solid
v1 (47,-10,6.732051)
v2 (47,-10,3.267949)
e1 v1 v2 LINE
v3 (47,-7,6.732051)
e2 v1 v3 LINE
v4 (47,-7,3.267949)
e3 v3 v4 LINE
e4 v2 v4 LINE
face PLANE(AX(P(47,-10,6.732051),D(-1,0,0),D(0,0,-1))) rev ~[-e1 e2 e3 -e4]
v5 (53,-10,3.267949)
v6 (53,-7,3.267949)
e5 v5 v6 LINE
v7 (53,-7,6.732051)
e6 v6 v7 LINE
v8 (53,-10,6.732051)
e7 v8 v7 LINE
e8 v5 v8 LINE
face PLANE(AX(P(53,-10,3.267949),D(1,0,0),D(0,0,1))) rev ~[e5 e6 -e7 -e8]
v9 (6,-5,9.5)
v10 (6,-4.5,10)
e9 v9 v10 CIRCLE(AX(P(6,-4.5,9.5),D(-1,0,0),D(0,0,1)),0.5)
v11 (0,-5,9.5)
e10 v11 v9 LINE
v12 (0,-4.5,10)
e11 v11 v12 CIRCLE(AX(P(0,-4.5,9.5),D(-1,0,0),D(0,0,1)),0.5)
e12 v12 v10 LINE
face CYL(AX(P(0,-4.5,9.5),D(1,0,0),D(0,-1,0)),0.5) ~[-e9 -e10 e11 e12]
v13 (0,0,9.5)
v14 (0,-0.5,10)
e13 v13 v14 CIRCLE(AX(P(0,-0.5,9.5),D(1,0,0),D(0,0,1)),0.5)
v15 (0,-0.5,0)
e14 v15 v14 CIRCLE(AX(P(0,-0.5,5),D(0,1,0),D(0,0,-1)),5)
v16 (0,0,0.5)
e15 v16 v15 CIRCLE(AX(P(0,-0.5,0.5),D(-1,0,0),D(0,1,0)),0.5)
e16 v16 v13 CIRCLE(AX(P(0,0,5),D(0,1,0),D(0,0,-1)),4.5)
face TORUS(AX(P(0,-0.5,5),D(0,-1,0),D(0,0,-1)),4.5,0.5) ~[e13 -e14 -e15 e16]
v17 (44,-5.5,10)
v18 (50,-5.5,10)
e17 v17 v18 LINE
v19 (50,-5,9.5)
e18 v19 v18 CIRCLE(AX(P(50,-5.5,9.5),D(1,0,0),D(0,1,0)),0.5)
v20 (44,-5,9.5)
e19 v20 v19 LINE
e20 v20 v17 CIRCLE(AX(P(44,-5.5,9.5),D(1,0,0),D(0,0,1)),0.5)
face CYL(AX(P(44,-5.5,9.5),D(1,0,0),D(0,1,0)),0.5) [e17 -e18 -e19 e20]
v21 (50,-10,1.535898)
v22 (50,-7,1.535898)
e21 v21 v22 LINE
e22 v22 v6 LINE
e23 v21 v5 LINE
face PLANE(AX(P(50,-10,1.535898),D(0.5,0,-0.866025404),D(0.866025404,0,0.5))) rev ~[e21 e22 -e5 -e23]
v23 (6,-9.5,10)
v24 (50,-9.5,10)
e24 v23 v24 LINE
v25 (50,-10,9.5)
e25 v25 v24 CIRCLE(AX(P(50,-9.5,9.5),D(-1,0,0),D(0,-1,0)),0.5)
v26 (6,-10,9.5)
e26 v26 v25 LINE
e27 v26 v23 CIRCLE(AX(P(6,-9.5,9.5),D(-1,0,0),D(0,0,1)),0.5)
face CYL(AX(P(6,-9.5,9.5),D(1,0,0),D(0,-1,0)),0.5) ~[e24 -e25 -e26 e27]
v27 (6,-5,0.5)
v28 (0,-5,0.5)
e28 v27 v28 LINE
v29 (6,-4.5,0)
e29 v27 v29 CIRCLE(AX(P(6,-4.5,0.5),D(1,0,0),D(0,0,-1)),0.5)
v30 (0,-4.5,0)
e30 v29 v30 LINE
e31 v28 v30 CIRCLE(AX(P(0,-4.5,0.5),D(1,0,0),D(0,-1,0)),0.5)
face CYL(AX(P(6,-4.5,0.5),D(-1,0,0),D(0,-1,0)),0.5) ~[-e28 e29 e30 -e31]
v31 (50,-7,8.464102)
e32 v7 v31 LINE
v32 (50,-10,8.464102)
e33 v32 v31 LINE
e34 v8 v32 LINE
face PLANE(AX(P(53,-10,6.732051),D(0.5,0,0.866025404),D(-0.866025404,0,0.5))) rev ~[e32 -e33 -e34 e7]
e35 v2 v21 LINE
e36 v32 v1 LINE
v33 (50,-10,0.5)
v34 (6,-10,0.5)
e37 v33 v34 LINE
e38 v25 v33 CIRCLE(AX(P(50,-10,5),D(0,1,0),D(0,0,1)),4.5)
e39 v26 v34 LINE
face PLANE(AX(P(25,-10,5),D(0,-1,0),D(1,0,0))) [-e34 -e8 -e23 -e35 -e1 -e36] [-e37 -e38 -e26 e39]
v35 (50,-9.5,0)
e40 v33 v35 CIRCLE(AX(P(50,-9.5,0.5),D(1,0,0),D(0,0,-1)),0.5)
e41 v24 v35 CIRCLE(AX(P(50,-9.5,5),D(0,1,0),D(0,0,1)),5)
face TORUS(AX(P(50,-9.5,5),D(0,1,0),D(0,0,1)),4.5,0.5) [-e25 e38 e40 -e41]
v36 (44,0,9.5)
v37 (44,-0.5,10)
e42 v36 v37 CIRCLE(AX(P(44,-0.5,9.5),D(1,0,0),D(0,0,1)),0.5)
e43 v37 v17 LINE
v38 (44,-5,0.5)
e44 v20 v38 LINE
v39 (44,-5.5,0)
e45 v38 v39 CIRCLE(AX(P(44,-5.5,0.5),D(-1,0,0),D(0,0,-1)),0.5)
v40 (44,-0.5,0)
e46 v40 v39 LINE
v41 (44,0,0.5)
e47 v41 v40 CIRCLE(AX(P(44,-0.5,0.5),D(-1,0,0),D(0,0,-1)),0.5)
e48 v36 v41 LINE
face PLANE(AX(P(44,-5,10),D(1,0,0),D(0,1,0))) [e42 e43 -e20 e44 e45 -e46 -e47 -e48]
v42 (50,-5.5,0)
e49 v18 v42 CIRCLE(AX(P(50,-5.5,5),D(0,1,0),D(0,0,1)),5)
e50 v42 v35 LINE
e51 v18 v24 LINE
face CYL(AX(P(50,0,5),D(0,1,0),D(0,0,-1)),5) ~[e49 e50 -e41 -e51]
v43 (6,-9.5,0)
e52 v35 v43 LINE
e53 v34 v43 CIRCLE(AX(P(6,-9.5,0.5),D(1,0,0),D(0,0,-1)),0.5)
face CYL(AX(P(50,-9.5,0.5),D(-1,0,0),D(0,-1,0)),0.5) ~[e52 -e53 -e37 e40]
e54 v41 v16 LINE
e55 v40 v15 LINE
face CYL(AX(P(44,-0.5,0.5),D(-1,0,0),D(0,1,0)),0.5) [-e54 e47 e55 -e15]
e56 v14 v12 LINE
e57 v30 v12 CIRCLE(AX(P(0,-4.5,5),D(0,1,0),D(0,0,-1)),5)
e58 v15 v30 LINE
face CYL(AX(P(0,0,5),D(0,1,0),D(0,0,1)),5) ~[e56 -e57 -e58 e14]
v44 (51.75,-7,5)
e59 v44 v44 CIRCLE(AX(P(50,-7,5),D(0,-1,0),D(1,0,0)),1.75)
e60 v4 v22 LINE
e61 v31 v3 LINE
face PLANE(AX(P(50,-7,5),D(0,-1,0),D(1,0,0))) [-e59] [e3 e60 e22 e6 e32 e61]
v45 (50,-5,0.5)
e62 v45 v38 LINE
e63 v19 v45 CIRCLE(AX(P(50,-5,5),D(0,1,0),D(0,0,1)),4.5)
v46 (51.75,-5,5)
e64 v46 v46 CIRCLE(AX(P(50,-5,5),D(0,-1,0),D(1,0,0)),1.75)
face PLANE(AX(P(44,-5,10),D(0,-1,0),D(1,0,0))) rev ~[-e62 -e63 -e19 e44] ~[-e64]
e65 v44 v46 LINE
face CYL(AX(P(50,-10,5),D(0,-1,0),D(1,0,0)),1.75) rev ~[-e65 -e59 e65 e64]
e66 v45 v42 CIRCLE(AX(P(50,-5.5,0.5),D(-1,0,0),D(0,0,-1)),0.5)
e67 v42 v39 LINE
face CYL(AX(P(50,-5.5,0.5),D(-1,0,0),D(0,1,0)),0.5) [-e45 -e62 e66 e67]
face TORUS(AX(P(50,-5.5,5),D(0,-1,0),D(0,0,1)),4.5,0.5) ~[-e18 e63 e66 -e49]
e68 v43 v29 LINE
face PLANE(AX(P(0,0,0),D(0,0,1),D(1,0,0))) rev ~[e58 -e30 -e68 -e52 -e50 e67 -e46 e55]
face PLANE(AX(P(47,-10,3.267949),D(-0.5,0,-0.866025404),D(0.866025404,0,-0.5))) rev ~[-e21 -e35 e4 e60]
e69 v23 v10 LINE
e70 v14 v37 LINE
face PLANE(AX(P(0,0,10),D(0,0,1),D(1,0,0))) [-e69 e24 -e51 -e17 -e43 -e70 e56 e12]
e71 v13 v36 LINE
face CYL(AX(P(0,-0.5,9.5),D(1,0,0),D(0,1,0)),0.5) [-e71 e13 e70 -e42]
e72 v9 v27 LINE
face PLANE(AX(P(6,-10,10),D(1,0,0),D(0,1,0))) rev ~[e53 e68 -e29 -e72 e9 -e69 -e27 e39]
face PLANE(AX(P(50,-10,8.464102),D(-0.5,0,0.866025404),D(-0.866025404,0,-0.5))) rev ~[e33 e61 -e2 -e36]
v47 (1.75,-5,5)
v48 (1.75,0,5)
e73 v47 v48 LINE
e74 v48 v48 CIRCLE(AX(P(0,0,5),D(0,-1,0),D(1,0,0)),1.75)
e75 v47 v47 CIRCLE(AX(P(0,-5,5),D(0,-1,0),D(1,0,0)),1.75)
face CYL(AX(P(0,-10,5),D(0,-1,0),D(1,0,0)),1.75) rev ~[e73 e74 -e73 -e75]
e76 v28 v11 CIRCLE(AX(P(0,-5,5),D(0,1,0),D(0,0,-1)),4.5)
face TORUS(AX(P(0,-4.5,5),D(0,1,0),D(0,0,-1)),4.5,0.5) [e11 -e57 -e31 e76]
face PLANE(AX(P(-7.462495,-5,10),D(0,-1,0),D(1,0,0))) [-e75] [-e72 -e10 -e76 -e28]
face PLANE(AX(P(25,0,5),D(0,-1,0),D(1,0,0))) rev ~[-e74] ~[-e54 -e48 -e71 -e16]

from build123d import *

# Parameters (mm, degrees)
F0_W     = 50
F0_H     = 10
F1_DEPTH = 10
F2_W     = 13.4624946701
F2_H     = 5
F2_W_2   = 13.2752915323
F3_DEPTH = 25
F4_R     = 1.75
F5_DEPTH = 25
F7_DEPTH = 3
F8_R     = 0.5


# Not quite as in the source:
# - a feature names something its author has since deleted; it is built from what else it names


with BuildPart() as f1:
    # F0 (on Front) → F1 (new body)
    with BuildSketch(Plane.XZ):
        with Locations((25, 5)):
            Rectangle(F0_W, F0_H)
        with BuildLine():
            ThreePointArc((0, 10), (-5, 5), (0, 0))
            Line((0, 0), (0, 10))
        make_face()
        with BuildLine():
            Line((50, 10), (50, 0))
            ThreePointArc((50, 0), (55, 5), (50, 10))
        make_face()
    extrude(amount=F1_DEPTH)

    # F2 (on face) → F3 (cut)
    with BuildSketch(Plane.XY.offset(10)):
        with Locations((-0.7312473351, -7.5)):
            Rectangle(F2_W, F2_H)
        with Locations((50.6376457661, -2.5)):
            Rectangle(F2_W_2, F2_H)
    extrude(amount=-F3_DEPTH, mode=Mode.SUBTRACT)

    # F4 (on face) → F5 (cut)
    with BuildSketch(Plane.XZ.offset(10)):
        with Locations((50, 5)):
            Circle(F4_R)
        with Locations((0, 5)):
            Circle(F4_R)
    extrude(amount=-F5_DEPTH, mode=Mode.SUBTRACT)

    # F6 (on face) → F7 (cut)
    with BuildSketch(Plane.XZ.offset(10)):
        Polygon((53, 3.2679491924), (53, 6.7320508076), (50, 8.4641016151), (47, 6.7320508076), (47, 3.2679491924), (50, 1.5358983849), align=None)
    extrude(amount=-F7_DEPTH, mode=Mode.SUBTRACT)

    # F8
    f8_edges = [f1.edges().sort_by_distance(p)[0] for p in [
        (28, -10, 10),
        (22, 0, 10),
        (-5, -5, 5),
        (55, -5, 5),
        (22, 0, 0),
        (47, -5, 0),
        (28, -10, 0),
        (3, -5, 0),
        (-5, 0, 5),
        (47, -5, 10),
        (55, -10, 5),
        (3, -5, 10),
    ]]
    fillet(f8_edges, radius=F8_R)


solid = f1.part
